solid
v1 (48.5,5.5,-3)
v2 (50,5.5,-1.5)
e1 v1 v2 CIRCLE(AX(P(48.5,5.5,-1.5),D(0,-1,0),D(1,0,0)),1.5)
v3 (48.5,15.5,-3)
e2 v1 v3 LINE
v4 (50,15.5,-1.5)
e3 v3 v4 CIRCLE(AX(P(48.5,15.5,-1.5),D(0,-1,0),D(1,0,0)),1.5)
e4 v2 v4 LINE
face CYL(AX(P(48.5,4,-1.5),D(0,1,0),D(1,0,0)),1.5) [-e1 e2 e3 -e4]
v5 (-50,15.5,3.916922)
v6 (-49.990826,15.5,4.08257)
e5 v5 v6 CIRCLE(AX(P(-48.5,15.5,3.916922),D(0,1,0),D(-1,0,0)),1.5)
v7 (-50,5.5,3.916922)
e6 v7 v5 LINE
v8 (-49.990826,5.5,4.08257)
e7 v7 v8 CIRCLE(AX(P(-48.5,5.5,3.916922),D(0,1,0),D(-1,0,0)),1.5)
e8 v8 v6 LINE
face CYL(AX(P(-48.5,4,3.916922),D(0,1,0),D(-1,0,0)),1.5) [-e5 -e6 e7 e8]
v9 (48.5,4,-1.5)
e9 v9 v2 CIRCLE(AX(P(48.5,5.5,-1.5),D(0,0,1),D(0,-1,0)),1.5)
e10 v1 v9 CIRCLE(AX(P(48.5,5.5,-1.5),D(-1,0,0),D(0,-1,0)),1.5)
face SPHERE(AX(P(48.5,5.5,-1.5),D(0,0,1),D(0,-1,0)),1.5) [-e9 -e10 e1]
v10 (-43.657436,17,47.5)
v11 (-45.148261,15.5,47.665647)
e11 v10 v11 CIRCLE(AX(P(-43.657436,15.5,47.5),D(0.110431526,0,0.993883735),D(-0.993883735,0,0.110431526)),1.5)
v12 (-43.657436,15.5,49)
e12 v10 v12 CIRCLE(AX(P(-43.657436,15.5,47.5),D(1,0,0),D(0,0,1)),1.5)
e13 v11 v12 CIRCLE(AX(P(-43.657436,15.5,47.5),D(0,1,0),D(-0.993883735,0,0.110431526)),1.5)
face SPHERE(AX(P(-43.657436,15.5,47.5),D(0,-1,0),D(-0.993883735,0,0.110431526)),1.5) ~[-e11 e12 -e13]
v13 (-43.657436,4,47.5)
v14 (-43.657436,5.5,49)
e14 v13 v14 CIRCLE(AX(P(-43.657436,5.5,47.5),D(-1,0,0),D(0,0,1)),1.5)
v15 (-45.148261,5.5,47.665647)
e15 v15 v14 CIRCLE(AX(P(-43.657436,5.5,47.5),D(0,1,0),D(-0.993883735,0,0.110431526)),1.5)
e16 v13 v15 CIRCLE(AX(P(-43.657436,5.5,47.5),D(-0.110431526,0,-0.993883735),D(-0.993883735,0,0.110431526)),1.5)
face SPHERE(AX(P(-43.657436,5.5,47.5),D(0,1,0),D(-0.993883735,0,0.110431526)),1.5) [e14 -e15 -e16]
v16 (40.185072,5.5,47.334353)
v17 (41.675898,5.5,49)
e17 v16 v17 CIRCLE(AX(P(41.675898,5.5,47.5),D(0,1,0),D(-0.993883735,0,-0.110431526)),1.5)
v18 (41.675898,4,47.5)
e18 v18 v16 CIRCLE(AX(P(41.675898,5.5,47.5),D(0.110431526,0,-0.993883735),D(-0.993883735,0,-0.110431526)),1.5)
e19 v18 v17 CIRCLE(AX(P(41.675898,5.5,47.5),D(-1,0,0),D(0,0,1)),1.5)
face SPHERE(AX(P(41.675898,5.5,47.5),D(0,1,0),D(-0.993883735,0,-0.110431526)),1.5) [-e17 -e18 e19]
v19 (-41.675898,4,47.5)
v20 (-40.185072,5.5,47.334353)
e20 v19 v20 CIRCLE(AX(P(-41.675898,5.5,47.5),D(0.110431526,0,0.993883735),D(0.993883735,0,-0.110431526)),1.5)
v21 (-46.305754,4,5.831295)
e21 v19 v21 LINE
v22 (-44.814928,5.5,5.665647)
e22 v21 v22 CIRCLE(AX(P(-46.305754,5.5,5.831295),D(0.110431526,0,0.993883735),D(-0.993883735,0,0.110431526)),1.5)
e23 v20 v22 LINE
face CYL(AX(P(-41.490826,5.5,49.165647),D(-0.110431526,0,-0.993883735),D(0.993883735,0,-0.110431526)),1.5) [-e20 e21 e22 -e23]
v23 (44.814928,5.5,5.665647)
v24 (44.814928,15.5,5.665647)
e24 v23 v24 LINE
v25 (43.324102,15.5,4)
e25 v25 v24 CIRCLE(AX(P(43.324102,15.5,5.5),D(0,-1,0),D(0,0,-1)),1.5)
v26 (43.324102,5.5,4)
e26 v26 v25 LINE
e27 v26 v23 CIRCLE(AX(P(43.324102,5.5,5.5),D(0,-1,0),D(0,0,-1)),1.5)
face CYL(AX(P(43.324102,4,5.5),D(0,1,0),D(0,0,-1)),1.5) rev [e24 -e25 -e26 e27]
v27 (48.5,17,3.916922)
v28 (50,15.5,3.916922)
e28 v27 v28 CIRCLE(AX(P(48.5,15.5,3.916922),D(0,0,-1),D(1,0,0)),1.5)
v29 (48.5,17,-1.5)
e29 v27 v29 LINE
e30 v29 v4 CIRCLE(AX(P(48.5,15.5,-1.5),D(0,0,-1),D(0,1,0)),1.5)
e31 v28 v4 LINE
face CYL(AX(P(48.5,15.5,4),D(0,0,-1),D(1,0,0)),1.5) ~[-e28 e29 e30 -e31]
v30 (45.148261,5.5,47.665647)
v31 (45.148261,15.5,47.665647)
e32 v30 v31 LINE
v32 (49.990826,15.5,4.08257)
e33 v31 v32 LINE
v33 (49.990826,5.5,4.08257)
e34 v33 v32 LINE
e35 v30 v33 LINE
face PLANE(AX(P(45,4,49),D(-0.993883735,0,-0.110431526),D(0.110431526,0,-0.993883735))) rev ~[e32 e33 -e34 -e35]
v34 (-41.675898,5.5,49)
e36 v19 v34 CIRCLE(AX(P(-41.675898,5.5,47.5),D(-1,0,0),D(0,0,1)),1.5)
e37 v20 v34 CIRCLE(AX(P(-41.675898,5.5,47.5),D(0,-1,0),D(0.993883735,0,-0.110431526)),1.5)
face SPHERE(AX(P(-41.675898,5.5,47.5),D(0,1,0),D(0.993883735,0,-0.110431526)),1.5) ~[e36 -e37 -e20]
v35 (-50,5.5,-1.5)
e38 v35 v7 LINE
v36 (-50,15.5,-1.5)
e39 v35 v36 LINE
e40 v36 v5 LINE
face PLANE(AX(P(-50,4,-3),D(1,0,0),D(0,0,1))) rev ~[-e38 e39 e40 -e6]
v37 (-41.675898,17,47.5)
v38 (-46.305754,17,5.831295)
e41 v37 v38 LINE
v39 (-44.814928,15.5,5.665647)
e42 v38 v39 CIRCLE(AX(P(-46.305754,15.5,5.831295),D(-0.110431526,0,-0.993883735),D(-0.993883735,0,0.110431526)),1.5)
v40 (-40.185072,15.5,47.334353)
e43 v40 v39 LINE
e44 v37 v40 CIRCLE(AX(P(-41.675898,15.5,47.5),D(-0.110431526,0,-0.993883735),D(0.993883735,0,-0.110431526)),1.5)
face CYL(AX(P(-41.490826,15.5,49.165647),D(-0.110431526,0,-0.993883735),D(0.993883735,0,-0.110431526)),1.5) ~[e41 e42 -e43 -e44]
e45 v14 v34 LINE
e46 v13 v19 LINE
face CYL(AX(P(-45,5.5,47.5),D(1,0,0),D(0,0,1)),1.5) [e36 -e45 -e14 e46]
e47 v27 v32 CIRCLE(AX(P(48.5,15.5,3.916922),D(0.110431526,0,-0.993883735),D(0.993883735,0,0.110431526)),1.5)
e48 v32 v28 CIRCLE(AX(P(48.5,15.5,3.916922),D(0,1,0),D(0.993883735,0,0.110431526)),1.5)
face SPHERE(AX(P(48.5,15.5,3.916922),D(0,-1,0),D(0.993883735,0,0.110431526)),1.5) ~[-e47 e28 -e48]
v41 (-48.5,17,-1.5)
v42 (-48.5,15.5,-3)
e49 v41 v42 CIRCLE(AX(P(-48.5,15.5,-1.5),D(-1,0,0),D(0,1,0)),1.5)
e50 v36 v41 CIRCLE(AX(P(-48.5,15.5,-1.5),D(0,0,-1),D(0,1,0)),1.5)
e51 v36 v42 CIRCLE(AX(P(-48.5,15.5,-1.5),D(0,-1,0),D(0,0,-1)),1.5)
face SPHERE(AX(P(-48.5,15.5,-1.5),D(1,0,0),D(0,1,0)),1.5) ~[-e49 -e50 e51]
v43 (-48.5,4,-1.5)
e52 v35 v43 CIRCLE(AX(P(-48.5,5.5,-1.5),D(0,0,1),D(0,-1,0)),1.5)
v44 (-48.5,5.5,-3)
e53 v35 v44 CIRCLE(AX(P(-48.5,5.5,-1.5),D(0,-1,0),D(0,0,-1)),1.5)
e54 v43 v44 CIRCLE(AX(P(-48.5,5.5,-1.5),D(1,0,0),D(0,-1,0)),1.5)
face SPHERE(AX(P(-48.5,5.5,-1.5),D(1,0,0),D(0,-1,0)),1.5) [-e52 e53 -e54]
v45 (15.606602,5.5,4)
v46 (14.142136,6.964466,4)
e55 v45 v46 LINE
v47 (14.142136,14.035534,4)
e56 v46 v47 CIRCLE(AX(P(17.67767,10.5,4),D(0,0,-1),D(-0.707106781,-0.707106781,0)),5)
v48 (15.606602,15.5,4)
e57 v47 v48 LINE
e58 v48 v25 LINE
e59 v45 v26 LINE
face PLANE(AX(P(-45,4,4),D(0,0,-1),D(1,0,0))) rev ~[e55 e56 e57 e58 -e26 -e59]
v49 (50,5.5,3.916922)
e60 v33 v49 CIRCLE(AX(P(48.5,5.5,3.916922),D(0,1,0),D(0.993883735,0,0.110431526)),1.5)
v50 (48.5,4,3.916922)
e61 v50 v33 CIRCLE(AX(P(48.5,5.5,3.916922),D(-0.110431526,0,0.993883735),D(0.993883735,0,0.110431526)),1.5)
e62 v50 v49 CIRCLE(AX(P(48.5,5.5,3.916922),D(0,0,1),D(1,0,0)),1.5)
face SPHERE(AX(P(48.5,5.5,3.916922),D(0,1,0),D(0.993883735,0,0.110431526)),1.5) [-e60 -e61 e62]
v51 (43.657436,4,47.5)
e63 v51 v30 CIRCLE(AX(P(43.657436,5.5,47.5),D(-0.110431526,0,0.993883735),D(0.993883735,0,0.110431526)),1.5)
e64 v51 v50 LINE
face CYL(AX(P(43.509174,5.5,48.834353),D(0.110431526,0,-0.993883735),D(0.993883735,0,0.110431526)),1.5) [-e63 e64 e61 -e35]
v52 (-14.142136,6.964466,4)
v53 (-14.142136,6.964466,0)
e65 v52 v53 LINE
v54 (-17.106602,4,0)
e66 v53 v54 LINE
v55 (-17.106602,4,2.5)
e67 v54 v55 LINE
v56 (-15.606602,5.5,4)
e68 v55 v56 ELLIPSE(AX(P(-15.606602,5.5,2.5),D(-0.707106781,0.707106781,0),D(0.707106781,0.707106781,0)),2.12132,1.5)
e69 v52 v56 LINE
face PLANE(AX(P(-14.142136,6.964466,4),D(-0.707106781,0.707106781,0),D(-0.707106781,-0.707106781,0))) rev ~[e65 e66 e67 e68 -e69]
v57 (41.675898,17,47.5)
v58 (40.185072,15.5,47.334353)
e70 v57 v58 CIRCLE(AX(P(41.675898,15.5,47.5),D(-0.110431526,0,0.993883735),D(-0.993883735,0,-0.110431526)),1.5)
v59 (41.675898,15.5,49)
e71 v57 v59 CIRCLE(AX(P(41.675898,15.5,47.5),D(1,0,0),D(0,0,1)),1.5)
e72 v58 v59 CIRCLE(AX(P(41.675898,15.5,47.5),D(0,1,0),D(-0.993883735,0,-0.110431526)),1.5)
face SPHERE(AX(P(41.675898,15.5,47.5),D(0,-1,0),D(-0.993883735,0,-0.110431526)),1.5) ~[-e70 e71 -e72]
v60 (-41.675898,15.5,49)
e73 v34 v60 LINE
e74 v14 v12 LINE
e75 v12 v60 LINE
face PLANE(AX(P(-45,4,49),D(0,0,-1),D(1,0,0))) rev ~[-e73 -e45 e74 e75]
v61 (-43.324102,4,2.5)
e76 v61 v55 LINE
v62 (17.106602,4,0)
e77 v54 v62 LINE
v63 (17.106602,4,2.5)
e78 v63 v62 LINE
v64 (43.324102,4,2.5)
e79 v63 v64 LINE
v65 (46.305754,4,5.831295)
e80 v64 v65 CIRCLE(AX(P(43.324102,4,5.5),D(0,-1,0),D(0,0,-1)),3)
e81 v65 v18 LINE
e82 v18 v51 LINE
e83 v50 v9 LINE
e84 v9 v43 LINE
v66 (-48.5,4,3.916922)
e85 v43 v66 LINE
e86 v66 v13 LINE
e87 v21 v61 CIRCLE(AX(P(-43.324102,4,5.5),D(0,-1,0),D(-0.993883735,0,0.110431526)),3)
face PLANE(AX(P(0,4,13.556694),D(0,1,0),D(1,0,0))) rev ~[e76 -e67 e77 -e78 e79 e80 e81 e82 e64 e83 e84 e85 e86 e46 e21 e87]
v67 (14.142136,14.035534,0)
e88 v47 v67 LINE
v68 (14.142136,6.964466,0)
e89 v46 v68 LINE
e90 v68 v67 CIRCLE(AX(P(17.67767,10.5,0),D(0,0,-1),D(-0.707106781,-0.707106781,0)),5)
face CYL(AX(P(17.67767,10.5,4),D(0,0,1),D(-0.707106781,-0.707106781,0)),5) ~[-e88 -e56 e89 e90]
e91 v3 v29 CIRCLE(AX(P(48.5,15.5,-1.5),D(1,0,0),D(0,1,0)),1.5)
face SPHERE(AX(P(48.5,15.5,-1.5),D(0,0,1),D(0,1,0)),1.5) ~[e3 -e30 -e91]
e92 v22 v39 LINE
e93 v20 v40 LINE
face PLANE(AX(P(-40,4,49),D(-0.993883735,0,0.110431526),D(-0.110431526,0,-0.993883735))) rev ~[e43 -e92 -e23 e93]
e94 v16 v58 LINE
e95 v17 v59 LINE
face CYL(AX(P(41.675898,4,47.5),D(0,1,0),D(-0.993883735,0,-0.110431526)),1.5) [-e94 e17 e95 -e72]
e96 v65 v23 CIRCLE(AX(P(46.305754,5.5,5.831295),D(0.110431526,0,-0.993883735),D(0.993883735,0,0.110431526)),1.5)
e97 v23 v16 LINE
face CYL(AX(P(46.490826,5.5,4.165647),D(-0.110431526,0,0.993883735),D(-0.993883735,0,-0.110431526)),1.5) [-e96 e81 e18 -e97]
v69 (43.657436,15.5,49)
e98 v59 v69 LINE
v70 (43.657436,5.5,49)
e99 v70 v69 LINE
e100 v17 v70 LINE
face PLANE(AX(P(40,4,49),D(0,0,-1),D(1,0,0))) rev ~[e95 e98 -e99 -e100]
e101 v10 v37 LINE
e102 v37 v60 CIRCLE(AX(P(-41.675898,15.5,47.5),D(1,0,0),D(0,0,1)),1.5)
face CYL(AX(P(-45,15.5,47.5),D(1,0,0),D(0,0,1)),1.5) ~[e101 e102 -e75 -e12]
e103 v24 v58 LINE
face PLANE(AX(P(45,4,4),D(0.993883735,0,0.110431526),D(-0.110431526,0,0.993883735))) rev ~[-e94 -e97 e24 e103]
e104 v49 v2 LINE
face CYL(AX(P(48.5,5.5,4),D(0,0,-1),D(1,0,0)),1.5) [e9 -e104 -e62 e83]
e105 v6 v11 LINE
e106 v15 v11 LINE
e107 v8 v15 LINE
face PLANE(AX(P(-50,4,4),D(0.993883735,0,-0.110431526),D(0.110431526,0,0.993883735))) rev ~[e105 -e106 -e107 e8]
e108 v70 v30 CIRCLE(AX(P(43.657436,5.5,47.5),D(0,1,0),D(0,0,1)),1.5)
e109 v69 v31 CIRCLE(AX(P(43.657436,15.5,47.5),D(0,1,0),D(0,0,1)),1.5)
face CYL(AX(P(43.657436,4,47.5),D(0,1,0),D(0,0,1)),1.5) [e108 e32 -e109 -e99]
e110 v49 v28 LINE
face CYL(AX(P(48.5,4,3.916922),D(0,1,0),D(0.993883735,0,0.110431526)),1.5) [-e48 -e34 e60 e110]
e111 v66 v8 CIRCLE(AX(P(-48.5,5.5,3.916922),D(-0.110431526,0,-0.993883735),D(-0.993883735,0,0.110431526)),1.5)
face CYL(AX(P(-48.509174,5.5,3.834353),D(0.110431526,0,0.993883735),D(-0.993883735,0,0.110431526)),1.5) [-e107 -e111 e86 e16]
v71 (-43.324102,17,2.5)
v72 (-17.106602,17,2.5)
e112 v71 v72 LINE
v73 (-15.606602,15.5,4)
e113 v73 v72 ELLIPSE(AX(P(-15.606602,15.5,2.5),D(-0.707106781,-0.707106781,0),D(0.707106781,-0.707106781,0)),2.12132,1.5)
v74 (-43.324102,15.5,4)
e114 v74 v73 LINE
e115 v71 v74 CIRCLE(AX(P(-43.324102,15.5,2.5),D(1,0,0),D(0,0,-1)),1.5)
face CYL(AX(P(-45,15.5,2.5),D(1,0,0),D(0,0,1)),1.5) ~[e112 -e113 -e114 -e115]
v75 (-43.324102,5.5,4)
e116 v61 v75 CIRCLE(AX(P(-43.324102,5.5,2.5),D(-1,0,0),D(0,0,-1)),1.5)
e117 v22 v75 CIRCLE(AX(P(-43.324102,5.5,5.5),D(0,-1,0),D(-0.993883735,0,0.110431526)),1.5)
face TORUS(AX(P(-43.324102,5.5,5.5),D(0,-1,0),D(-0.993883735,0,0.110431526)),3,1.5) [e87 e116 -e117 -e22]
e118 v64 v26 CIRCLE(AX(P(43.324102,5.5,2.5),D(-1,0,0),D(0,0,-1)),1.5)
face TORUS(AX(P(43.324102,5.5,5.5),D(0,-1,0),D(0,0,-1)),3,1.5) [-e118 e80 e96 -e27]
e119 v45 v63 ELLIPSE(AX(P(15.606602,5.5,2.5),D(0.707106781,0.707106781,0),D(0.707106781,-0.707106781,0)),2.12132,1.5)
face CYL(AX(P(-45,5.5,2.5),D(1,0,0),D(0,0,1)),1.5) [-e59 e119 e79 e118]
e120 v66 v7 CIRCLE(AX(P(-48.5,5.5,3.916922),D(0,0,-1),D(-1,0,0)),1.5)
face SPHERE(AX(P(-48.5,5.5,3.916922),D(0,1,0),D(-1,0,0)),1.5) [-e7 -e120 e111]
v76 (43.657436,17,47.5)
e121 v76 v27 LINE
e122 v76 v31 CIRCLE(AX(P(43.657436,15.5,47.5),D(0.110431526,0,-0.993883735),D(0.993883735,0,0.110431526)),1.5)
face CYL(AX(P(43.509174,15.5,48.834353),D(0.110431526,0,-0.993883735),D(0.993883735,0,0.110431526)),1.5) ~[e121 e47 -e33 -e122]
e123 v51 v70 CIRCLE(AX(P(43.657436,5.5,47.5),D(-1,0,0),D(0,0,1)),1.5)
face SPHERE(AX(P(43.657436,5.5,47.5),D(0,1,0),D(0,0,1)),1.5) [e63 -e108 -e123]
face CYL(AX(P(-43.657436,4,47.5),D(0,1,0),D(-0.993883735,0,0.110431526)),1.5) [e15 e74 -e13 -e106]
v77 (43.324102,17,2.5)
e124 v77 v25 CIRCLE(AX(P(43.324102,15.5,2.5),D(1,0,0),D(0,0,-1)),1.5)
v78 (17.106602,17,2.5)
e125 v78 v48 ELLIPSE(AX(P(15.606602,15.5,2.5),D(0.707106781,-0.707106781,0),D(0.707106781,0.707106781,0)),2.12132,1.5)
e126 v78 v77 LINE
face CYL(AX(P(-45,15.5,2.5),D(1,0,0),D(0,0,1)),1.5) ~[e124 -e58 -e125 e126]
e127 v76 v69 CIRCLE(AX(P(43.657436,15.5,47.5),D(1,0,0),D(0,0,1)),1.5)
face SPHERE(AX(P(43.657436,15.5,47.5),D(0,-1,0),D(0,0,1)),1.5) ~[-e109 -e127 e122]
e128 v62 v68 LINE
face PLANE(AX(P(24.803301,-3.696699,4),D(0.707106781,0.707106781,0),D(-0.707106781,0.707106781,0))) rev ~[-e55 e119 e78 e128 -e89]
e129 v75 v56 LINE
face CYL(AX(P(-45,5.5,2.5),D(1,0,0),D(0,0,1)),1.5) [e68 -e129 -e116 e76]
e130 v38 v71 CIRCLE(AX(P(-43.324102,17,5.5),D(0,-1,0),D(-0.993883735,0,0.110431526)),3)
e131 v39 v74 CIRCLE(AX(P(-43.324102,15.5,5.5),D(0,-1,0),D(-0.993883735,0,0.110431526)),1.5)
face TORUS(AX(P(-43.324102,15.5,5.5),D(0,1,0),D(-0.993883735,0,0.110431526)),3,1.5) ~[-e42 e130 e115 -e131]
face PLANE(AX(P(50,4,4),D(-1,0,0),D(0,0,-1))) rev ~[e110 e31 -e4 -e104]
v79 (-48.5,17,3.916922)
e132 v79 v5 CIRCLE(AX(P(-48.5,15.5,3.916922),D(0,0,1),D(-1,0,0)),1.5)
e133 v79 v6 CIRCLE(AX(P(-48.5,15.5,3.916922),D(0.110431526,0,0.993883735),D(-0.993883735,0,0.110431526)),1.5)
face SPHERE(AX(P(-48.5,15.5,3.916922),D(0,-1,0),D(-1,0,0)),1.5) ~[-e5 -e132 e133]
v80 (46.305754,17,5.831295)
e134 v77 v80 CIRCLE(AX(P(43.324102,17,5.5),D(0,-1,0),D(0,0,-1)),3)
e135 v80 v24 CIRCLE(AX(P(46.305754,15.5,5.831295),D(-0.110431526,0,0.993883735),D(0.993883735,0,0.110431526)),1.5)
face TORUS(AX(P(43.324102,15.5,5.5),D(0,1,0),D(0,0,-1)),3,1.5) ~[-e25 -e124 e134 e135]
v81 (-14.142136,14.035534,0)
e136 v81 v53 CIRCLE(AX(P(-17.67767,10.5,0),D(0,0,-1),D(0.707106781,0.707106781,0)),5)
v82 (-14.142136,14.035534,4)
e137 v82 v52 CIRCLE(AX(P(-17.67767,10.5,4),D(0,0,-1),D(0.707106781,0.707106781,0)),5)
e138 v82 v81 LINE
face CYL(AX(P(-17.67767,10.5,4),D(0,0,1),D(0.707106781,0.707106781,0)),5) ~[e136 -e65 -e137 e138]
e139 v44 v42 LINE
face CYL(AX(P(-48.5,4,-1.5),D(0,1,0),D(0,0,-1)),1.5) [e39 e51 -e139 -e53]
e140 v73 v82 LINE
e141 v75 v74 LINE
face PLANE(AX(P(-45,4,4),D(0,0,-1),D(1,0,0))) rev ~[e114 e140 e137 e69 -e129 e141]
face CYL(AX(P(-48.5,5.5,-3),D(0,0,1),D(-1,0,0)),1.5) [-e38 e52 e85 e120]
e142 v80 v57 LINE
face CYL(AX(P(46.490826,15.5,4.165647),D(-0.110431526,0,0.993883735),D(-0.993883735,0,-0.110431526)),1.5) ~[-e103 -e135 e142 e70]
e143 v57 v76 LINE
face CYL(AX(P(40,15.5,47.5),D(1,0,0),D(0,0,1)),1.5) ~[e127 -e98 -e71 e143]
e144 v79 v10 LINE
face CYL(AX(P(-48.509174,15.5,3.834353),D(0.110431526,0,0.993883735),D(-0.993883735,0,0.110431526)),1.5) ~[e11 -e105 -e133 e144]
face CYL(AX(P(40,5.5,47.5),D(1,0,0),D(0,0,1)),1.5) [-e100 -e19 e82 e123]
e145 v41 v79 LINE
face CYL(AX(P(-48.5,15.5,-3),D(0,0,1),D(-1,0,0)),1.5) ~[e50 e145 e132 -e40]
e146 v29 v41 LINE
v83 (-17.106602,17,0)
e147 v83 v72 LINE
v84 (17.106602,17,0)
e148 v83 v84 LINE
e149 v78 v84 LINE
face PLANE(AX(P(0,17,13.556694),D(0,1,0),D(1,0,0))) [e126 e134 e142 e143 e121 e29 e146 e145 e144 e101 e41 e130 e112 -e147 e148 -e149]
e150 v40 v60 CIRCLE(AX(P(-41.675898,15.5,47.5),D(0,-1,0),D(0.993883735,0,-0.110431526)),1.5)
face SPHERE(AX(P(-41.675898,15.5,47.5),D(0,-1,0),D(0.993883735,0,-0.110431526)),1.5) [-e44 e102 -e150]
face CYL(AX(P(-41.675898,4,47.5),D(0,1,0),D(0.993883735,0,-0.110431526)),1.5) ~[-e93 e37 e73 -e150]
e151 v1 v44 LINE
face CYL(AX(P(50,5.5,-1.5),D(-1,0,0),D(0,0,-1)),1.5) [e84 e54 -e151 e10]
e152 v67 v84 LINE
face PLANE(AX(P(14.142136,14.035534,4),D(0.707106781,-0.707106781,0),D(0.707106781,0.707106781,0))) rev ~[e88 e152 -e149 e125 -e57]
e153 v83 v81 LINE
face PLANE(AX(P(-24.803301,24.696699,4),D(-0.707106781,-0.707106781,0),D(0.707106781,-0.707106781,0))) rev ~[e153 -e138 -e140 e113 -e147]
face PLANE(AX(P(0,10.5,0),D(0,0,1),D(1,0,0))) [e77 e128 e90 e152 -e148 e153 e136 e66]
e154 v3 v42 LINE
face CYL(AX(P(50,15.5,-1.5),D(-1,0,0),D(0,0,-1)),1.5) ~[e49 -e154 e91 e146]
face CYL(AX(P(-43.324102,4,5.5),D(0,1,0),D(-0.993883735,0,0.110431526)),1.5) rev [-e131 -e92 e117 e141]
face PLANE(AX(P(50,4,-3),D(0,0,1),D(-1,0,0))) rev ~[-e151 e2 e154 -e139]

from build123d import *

# Parameters (mm, degrees)
F1_DEPTH = 13
F2_R     = 1.5
F4_DEPTH = 4
F5_ANGLE = -90


with BuildPart() as f1:
    # F0 (on Top) → F1 (new body)
    with BuildSketch(Plane.XY):
        Polygon((-40, -45), (-45, 0), (0, 0), (45, 0), (40, -45), (45, -45), (50, 0), (50, 7), (45, 7), (44.8581193677, 7), (-44.8581193677, 7), (-45, 7), (-50, 7), (-50, 0), (-45, -45), align=None)
    extrude(amount=F1_DEPTH)

    # F2
    f2_edges = [f1.edges().sort_by_distance(p)[0] for p in [
        (-42.5, -22.5, 13),
        (0, 0, 13),
        (42.5, -22.5, 13),
        (42.5, -45, 13),
        (47.5, -22.5, 13),
        (50, 3.5, 13),
        (0, 7, 13),
        (-50, 3.5, 13),
        (-47.5, -22.5, 13),
        (-42.5, -45, 13),
        (-42.5, -22.5, 0),
        (0, 0, 0),
        (42.5, -22.5, 0),
        (42.5, -45, 0),
        (47.5, -22.5, 0),
        (50, 3.5, 0),
        (0, 7, 0),
        (-50, 3.5, 0),
        (-47.5, -22.5, 0),
        (-42.5, -45, 0),
        (40, -45, 6.5),
        (45, -45, 6.5),
        (-45, -45, 6.5),
        (-40, -45, 6.5),
        (-45, 0, 6.5),
        (45, 0, 6.5),
        (-50, 7, 6.5),
        (-50, 0, 6.5),
        (50, 0, 6.5),
        (50, 7, 6.5),
    ]]
    fillet(f2_edges, radius=F2_R)

    # F3 (on face) → F4 (cut)
    with BuildSketch(Plane.XZ):
        with BuildLine():
            Line((-14.1421356237, 2.9644660941), (-15.6066017178, 1.5))
            Line((-15.6066017178, 1.5), (15.6066017178, 1.5))
            Line((15.6066017178, 1.5), (14.1421356237, 2.9644660941))
            ThreePointArc((14.1421356237, 2.9644660941), (12.6776695297, 6.5), (14.1421356237, 10.0355339059))
            Line((14.1421356237, 10.0355339059), (15.6066017178, 11.5))
            Line((15.6066017178, 11.5), (-15.6066017178, 11.5))
            Line((-15.6066017178, 11.5), (-14.1421356237, 10.0355339059))
            ThreePointArc((-14.1421356237, 10.0355339059), (-12.6776695297, 6.5), (-14.1421356237, 2.9644660941))
        make_face()
        Polygon((-24.8033008589, 20.6966991411), (-15.6066017178, 11.5), (15.6066017178, 11.5), (24.8033008589, 20.6966991411), (19.5, 26), (14.1966991411, 31.3033008589), (0, 17.1066017178), (-14.1966991411, 31.3033008589), (-19.5, 26), align=None)
        Polygon((-24.8033008589, -7.6966991411), (-19.5, -13), (-14.1966991411, -18.3033008589), (0, -4.1066017178), (14.1966991411, -18.3033008589), (19.5, -13), (24.8033008589, -7.6966991411), (15.6066017178, 1.5), (-15.6066017178, 1.5), align=None)
    extrude(amount=-F4_DEPTH, mode=Mode.SUBTRACT)


with BuildPart() as f1_1:
    # F5: moved
    add(f1.part.rotate(Axis((0, 4, 0), (1, 0, 0)), F5_ANGLE))


solid = f1_1.part
